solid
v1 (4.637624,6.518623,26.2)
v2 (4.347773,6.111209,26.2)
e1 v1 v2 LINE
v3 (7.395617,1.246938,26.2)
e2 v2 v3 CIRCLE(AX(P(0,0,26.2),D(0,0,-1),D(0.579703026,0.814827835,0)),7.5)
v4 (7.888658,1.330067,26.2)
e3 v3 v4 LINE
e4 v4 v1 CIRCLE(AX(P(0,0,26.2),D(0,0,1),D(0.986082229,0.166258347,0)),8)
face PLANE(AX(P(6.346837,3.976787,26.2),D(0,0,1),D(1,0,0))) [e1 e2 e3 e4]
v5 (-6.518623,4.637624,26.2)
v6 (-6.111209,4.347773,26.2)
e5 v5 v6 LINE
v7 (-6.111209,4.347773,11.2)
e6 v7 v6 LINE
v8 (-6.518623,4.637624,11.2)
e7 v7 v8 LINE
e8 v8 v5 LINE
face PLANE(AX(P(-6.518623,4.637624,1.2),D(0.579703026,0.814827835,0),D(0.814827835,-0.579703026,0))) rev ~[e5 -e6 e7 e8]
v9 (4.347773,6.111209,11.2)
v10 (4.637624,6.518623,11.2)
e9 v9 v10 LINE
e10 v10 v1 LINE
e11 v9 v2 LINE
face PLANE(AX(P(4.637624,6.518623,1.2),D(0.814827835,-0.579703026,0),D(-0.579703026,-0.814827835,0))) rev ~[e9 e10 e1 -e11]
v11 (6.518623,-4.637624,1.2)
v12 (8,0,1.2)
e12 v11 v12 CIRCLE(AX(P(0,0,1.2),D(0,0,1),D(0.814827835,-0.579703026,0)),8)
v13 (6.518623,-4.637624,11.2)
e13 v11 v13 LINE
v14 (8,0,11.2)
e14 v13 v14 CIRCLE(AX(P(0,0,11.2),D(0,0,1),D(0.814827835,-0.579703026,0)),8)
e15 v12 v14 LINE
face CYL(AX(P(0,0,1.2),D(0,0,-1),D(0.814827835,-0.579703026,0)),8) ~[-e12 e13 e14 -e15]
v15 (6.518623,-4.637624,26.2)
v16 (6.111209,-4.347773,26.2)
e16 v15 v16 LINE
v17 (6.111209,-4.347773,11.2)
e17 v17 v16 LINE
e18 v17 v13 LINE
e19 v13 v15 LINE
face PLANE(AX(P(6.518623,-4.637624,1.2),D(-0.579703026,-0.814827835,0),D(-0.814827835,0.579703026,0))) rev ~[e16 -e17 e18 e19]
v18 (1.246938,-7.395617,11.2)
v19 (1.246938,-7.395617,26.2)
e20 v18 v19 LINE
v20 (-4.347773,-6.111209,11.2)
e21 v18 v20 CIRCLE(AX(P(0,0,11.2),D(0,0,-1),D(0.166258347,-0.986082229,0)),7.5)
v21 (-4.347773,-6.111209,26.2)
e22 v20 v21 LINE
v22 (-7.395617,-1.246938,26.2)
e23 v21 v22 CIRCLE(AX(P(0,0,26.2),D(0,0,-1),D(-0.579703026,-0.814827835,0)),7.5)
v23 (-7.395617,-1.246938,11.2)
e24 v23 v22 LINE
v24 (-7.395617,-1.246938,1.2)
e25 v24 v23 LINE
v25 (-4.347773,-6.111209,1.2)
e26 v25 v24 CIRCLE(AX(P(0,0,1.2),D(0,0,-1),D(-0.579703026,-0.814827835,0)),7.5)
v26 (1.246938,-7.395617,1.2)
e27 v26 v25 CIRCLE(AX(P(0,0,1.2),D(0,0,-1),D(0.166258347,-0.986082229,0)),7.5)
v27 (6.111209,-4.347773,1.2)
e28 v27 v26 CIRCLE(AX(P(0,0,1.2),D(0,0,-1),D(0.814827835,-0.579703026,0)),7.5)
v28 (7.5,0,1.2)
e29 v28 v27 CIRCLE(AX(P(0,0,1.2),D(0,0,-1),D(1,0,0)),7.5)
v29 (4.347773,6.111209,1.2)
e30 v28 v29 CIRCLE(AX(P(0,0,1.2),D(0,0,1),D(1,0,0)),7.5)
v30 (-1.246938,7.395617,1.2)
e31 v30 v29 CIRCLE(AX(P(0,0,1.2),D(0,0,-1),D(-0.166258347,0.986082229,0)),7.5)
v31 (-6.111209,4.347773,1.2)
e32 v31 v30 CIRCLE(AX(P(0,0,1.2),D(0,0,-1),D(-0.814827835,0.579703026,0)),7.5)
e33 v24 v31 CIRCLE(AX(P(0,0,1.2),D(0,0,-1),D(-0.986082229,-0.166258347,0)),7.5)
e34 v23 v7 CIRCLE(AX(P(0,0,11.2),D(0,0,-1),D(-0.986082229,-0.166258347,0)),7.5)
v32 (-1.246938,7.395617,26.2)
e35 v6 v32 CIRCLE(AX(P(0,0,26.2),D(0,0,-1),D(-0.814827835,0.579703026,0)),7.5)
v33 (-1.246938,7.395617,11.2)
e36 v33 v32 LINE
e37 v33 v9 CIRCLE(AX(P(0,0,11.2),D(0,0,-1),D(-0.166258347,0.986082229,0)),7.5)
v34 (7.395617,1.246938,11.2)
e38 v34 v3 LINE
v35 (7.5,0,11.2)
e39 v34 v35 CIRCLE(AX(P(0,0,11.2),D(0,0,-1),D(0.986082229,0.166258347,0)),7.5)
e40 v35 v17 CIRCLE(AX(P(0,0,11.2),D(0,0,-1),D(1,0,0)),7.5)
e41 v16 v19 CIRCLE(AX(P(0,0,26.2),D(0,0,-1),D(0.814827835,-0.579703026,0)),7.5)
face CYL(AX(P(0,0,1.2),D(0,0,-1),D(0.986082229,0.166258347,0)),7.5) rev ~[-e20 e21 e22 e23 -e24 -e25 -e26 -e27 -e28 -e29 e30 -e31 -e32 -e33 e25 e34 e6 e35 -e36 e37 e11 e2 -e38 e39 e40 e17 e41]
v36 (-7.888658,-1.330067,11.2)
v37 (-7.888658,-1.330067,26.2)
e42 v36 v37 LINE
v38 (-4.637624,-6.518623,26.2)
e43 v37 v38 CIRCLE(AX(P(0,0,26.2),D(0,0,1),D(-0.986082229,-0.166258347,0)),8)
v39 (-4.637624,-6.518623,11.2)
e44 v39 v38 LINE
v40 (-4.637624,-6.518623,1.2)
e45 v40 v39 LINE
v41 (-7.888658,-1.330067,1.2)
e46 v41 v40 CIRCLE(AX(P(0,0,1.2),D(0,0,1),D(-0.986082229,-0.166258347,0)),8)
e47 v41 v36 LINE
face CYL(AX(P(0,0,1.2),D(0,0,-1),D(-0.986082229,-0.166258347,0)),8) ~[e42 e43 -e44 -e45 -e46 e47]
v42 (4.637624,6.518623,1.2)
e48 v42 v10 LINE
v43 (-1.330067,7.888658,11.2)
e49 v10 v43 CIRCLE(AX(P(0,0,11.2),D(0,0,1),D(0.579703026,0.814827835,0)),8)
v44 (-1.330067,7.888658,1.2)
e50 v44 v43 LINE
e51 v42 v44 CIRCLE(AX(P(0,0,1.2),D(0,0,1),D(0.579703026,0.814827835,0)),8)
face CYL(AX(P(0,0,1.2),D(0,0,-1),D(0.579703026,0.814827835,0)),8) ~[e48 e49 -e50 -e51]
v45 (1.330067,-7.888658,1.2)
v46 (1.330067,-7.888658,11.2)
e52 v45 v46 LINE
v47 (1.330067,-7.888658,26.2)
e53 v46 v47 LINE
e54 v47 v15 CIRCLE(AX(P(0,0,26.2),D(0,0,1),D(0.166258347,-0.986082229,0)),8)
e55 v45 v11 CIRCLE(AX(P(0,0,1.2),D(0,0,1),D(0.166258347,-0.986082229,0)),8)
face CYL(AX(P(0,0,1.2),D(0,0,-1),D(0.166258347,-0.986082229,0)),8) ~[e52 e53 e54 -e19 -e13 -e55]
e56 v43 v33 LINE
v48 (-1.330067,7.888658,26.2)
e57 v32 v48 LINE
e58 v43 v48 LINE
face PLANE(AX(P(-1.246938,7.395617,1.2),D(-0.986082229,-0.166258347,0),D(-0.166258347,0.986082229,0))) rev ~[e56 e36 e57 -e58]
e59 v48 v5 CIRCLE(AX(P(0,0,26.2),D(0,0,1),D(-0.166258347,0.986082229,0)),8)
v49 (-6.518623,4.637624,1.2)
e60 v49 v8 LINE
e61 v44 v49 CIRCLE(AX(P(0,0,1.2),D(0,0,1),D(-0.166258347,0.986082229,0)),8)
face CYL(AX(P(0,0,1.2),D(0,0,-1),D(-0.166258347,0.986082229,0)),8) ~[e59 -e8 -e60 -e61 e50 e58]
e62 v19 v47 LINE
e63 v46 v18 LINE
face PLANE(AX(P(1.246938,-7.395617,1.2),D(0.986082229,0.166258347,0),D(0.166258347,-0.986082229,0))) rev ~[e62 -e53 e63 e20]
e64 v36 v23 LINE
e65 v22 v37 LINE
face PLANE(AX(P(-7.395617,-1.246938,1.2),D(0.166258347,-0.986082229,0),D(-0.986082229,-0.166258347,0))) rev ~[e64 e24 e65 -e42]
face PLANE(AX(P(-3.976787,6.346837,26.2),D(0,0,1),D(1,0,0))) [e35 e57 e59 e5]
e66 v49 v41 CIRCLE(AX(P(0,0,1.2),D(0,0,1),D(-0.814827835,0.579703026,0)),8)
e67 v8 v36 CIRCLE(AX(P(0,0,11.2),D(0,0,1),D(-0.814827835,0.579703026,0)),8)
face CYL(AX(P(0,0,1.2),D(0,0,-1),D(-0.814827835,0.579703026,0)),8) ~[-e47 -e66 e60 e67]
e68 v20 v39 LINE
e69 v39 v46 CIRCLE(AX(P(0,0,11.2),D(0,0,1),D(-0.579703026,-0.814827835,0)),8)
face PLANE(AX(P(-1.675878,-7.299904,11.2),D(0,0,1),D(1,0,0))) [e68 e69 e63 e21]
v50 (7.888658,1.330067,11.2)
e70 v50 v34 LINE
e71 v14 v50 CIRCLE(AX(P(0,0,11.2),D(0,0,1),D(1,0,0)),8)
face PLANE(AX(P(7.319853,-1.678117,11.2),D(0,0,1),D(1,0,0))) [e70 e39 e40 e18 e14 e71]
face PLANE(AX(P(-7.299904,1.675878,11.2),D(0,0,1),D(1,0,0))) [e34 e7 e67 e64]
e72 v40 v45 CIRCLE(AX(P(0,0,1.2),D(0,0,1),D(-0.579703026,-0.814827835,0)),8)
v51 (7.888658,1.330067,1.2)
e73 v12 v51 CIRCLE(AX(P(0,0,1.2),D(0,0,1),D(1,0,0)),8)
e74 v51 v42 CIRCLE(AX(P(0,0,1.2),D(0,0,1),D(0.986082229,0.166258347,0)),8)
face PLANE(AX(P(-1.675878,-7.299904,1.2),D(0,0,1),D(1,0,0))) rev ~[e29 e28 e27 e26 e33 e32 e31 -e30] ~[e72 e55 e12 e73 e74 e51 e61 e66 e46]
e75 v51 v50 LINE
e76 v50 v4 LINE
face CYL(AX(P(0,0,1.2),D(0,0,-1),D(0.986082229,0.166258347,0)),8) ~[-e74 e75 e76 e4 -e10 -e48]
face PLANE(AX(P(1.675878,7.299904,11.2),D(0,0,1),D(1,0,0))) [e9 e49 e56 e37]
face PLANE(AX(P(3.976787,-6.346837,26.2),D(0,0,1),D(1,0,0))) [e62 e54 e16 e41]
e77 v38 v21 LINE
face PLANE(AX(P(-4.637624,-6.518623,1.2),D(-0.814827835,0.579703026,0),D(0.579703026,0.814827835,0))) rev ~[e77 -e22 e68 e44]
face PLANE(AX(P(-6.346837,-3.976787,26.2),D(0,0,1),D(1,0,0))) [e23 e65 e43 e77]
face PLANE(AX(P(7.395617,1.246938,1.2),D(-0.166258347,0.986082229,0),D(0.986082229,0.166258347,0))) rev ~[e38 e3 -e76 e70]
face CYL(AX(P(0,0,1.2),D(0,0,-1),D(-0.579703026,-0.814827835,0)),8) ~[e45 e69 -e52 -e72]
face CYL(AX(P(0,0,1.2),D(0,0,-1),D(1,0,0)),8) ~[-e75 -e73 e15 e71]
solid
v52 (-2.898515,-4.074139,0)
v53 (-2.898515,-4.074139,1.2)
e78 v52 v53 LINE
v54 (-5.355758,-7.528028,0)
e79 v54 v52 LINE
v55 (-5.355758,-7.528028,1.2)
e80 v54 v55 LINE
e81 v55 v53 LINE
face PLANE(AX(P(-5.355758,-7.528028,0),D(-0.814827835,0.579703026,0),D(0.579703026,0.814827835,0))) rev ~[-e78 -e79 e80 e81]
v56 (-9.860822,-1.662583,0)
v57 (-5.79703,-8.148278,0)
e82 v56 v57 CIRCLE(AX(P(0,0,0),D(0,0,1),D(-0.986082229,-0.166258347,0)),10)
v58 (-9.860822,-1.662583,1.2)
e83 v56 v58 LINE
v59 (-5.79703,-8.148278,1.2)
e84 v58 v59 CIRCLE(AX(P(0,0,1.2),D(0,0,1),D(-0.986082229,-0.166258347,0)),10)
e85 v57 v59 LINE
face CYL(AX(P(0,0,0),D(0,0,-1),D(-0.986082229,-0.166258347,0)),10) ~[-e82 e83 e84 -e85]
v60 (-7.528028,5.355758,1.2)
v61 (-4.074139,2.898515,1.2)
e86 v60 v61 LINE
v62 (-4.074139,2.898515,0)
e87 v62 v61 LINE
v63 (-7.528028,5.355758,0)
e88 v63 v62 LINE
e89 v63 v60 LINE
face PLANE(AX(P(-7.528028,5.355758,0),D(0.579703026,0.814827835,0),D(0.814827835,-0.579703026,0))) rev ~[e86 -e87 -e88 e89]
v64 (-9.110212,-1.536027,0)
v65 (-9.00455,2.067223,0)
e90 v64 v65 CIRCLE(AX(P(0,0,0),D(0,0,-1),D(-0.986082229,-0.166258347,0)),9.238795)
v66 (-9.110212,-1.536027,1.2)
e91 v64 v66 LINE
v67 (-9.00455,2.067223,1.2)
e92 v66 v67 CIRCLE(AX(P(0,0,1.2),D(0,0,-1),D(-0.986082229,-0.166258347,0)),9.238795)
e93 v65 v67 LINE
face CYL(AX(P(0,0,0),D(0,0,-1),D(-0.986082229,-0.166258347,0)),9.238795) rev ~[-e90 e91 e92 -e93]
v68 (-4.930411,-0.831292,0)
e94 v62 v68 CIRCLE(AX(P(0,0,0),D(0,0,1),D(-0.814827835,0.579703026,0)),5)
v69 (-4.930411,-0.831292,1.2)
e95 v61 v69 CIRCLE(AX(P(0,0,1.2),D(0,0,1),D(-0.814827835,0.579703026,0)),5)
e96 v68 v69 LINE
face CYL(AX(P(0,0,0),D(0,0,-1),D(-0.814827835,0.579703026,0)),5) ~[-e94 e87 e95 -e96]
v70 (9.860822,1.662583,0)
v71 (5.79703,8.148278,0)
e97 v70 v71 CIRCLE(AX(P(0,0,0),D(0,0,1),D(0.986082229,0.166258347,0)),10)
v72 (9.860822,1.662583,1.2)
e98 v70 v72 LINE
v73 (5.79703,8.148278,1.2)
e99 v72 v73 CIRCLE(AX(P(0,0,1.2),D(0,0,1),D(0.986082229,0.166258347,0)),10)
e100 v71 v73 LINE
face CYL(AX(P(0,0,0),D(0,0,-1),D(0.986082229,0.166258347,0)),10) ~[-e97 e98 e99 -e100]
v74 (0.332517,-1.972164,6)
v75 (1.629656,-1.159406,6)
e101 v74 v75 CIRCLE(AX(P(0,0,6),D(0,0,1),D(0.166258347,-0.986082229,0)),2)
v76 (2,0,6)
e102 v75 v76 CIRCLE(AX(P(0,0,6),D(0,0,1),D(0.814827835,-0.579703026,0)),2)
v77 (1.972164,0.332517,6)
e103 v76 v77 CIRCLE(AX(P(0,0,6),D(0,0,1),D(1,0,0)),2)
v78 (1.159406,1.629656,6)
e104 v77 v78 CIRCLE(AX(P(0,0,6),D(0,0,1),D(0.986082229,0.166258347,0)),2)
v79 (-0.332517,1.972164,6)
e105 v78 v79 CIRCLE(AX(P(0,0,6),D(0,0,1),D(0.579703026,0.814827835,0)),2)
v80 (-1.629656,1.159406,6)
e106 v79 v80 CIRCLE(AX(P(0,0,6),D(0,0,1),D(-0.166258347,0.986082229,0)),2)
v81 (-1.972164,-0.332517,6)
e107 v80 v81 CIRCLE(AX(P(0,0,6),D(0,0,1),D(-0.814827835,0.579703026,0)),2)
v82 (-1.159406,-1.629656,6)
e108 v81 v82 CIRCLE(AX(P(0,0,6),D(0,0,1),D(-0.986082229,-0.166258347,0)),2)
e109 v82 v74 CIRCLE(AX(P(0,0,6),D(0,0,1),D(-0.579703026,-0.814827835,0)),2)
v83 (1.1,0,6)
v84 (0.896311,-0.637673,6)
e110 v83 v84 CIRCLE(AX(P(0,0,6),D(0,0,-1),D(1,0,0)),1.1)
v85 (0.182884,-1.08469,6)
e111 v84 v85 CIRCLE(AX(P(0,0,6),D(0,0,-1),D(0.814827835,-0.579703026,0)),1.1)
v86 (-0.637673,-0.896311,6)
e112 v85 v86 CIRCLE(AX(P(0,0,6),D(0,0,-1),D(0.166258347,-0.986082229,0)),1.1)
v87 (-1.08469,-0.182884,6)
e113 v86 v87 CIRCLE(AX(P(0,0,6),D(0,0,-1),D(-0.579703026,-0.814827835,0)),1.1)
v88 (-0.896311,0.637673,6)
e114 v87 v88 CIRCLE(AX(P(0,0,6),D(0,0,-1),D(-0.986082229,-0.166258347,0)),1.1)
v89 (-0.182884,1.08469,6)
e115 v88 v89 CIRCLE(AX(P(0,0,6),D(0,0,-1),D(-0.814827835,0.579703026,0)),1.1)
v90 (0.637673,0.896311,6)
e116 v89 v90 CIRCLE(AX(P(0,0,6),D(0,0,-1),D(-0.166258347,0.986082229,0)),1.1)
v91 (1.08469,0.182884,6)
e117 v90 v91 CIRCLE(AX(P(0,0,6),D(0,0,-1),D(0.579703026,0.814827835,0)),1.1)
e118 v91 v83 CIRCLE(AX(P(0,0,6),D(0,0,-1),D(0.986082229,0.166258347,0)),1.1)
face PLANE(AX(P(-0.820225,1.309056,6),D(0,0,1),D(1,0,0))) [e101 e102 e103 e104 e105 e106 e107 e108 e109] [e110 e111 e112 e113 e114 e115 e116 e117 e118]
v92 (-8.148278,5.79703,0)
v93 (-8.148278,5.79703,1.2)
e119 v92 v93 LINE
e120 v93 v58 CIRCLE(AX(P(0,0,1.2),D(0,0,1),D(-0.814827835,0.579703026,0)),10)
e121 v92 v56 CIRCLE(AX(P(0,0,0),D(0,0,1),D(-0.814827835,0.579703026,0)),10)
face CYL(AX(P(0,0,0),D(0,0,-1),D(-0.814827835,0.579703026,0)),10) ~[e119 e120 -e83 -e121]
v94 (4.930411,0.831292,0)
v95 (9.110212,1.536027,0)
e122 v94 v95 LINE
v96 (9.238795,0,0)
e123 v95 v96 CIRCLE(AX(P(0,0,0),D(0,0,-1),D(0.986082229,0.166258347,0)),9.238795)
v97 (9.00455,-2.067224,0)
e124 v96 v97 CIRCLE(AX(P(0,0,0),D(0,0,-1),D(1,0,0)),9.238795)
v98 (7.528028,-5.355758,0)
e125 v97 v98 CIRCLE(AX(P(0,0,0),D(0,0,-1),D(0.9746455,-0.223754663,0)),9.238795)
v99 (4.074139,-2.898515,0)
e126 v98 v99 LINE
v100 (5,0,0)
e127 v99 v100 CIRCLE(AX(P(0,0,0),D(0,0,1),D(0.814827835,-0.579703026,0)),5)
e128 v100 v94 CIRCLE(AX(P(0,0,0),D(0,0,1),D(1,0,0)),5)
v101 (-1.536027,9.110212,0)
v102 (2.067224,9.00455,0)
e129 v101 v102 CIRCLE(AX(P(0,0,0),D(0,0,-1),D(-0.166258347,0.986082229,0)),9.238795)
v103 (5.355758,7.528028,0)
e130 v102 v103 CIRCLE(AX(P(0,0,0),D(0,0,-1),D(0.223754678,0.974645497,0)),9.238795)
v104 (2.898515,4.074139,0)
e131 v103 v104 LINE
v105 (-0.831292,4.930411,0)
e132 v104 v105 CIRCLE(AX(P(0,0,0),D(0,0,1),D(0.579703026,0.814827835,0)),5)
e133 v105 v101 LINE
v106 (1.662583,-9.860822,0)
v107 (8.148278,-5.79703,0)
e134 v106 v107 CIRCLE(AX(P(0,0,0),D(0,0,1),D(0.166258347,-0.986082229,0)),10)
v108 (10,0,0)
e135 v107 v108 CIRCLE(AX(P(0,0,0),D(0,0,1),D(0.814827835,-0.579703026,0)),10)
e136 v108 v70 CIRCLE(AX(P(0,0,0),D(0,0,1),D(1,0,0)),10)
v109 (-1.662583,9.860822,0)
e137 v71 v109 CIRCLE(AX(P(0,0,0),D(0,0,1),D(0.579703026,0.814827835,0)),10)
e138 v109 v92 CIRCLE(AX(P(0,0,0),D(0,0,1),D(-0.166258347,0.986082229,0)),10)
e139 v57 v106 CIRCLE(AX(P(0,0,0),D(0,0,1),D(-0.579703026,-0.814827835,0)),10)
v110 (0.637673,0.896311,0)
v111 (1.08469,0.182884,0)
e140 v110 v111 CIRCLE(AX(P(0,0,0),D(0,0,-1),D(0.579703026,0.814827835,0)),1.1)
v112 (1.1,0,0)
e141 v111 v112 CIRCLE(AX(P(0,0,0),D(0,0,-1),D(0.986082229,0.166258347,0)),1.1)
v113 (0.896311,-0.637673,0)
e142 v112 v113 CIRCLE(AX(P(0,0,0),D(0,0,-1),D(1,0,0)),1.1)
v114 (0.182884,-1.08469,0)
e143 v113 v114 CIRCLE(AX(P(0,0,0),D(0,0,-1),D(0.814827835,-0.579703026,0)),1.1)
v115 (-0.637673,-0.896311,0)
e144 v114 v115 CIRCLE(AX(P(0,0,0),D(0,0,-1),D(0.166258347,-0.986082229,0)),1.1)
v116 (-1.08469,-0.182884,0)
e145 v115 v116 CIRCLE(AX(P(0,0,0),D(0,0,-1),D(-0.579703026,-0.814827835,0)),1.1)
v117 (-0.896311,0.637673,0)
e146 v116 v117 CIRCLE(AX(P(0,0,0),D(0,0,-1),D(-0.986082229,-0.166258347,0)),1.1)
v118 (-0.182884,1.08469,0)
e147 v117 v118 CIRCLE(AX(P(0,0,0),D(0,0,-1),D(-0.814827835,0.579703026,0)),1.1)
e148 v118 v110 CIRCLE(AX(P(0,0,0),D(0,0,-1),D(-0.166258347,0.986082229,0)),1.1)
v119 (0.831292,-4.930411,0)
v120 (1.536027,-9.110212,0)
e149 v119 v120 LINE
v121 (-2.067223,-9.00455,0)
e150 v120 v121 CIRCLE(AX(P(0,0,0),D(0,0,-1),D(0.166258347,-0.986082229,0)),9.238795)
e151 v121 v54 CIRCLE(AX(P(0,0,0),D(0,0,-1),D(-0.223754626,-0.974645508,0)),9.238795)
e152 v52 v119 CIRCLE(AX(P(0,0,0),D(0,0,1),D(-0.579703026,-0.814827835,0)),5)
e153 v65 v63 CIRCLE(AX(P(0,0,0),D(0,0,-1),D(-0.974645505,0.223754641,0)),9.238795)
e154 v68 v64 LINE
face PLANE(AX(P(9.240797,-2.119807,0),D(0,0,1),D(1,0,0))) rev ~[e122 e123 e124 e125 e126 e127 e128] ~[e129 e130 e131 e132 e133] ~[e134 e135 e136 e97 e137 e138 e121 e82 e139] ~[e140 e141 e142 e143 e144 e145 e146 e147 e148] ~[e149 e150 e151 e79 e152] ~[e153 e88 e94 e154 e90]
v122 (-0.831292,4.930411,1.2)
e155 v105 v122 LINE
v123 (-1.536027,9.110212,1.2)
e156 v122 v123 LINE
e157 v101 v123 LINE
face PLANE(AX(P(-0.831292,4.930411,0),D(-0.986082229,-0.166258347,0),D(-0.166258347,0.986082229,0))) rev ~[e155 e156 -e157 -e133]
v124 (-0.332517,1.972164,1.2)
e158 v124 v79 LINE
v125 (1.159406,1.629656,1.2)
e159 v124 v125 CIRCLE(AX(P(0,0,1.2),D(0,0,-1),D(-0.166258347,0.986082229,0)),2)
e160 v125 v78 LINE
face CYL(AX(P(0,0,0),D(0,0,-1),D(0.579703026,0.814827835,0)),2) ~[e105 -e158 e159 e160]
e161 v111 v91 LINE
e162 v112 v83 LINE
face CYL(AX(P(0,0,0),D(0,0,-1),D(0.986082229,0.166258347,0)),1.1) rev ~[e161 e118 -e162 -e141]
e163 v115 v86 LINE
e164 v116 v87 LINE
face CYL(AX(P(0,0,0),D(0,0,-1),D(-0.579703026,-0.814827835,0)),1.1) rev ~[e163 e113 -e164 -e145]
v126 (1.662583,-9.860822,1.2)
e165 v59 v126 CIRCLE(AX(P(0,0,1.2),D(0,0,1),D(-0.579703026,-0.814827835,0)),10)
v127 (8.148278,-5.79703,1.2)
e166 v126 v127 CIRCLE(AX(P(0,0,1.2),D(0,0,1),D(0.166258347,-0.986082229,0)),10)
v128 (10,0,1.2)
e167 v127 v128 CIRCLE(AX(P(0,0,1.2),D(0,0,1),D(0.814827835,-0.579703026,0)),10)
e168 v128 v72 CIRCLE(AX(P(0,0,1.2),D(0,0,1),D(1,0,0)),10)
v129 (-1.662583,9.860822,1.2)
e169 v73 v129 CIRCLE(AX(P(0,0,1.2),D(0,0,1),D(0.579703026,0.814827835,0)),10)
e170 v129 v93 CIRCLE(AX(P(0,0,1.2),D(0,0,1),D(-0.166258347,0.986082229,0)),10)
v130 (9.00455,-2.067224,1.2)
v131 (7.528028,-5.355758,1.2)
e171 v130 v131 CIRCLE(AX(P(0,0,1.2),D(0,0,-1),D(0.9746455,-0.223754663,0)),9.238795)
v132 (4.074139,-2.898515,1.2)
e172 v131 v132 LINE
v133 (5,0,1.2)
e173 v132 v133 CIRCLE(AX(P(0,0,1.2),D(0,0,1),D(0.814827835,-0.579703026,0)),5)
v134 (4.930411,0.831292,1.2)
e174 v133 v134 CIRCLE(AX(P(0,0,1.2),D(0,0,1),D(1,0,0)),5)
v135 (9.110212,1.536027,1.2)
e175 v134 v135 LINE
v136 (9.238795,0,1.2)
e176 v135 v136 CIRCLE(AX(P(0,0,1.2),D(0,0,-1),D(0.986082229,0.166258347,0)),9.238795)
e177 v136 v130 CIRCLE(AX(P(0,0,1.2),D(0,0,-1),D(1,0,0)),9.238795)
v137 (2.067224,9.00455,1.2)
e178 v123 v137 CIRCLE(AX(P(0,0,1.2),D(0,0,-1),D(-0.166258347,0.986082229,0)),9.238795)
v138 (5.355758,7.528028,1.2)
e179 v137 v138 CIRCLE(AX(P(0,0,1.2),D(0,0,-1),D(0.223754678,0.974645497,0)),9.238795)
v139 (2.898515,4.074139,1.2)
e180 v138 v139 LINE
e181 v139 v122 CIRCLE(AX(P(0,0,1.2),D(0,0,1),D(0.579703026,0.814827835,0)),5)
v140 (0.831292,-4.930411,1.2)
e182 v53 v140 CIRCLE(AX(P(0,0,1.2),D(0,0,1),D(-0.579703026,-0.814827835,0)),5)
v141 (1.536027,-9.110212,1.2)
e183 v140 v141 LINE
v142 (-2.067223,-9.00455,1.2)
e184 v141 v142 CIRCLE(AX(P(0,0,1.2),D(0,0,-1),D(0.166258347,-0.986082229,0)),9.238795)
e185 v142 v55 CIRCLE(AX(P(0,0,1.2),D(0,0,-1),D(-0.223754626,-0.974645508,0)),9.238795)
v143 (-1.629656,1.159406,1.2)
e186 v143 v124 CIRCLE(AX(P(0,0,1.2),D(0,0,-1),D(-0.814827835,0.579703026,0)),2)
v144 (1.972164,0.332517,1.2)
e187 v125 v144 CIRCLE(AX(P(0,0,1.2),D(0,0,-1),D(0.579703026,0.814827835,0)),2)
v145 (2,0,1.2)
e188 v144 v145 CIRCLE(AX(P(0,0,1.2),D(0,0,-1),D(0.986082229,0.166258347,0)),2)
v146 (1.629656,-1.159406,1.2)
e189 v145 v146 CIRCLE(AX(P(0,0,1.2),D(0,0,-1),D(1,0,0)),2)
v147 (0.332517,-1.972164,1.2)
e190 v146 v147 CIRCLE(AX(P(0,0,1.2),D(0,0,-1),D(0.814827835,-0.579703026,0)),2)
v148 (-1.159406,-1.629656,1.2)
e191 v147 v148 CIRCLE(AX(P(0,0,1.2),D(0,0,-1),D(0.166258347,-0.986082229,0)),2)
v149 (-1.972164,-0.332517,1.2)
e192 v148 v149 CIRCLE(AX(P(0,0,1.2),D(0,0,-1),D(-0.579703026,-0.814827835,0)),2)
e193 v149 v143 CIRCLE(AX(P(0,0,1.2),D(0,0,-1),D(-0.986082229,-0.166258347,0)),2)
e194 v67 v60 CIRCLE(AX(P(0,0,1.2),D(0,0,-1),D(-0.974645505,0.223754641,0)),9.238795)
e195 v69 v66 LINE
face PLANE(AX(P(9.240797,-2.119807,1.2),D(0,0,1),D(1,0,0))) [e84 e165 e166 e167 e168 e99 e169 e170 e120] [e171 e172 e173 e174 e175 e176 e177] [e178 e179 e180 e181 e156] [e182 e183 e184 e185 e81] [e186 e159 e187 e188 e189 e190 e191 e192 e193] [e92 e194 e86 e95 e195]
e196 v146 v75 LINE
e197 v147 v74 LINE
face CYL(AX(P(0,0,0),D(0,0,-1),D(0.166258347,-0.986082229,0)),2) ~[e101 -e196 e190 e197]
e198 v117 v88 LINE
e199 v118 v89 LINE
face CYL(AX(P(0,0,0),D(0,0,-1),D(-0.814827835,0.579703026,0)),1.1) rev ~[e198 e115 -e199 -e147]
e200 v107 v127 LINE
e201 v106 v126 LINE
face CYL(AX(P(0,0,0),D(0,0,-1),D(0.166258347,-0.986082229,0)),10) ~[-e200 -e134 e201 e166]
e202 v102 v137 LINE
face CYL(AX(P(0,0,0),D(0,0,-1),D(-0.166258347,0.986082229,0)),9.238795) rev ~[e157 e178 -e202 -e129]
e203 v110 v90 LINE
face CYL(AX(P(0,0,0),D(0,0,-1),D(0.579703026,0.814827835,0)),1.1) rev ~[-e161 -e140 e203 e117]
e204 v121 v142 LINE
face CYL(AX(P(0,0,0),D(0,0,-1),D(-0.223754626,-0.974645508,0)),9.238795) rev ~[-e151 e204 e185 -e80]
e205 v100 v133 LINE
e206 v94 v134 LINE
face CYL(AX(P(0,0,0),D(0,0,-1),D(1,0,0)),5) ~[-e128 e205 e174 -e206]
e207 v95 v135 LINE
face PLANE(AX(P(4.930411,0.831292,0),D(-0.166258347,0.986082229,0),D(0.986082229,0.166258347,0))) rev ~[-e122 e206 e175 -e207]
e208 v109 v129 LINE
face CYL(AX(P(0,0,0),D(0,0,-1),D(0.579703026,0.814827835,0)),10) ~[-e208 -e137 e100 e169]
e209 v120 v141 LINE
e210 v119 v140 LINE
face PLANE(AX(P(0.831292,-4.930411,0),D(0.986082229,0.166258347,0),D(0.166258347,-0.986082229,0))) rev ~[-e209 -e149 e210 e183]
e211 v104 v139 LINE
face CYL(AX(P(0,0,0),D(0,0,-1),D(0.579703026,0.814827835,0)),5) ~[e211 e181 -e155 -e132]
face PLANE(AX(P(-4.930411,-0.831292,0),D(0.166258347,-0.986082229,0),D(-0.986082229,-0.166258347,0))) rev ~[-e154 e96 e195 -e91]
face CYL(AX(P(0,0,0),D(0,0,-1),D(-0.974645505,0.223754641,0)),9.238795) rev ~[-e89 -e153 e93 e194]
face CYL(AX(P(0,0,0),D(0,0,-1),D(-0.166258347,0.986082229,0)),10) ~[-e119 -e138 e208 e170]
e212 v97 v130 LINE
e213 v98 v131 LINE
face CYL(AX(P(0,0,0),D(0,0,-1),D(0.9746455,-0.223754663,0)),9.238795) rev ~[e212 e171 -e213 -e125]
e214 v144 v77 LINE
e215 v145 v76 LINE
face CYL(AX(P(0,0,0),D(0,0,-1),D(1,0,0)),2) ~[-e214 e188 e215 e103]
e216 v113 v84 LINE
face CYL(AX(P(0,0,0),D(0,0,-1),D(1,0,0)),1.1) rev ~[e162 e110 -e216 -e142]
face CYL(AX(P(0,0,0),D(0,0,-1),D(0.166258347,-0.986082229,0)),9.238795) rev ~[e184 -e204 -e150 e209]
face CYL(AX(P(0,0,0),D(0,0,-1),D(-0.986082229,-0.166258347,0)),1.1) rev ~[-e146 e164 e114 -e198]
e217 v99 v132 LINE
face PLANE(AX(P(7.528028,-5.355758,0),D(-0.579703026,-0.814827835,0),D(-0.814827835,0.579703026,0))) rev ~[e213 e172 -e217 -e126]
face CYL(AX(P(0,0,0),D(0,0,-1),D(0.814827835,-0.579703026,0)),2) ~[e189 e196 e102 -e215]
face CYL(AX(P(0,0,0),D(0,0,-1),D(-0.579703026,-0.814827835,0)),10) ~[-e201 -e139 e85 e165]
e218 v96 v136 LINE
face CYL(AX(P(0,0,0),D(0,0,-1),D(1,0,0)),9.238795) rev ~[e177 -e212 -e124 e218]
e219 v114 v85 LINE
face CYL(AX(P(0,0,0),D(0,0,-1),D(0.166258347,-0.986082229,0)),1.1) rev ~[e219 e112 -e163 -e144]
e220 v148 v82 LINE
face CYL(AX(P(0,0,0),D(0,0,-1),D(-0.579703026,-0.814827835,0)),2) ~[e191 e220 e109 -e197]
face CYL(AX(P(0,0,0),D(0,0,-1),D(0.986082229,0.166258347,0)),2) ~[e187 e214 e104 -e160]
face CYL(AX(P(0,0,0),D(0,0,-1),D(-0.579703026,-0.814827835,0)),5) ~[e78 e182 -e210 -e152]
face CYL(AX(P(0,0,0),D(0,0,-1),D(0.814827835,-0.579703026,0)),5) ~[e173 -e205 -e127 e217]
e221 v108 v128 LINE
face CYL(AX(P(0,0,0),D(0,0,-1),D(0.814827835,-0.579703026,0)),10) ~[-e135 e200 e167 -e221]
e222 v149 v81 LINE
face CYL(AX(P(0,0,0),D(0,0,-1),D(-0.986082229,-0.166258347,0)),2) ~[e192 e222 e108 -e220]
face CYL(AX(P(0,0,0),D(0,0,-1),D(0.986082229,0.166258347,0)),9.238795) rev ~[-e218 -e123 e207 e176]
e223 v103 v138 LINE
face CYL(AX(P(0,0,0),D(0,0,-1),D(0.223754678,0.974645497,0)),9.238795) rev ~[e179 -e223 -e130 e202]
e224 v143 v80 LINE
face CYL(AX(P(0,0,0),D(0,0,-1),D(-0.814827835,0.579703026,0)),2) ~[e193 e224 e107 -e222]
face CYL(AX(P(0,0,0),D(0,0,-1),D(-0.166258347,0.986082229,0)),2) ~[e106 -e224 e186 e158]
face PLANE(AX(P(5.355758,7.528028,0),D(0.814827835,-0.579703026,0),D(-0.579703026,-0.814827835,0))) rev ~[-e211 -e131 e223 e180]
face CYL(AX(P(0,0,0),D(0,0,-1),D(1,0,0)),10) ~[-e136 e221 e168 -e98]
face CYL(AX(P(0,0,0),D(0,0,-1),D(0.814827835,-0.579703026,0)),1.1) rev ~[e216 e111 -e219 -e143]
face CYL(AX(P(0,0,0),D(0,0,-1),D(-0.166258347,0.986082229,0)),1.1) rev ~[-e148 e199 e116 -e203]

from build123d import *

# Parameters (mm, degrees)
F1_DEPTH = 1.2
F2_DEPTH = 6
F4_DEPTH = 25
F5_DEPTH = 10


with BuildPart() as f1:
    # F0 (on Top) → F1 (new body)
    with BuildSketch(Plane.XY):
        with BuildLine():
            ThreePointArc((8.1482783535, -5.7970302633), (9.5258276159, -3.0427961207), (10, 0))
            ThreePointArc((10, 0), (9.965144828, 0.8341993506), (9.8608222887, 1.6625834689))
            Line((9.8608222887, 1.6625834689), (9.0045502887, -2.0672235383))
            Line((9.0045502887, -2.0672235383), (8.1482783535, -5.7970302633))
        make_face()
        with BuildLine():
            Line((7.8289263433, 4.9054308037), (9.8608222887, 1.6625834689))
            ThreePointArc((9.8608222887, 1.6625834689), (8.4739687378, 5.3096001573), (5.7970302633, 8.1482783535))
            Line((5.7970302633, 8.1482783535), (7.8289263433, 4.9054308037))
        make_face()
        with BuildLine():
            Line((9.1102118863, 1.536026838), (9.8608222887, 1.6625834689))
            Line((9.8608222887, 1.6625834689), (7.8289263433, 4.9054308037))
            ThreePointArc((7.8289263433, 4.9054308037), (8.6354977715, 3.2838266242), (9.1102118863, 1.536026838))
        make_face()
        with BuildLine():
            Line((9.0045502887, -2.0672235383), (9.8608222887, 1.6625834689))
            Line((9.8608222887, 1.6625834689), (9.1102118863, 1.536026838))
            ThreePointArc((9.1102118863, 1.536026838), (9.2065933451, 0.7706997061), (9.2387953251, 0))
            ThreePointArc((9.2387953251, 0), (9.1800472812, -1.040226405), (9.0045502887, -2.0672235383))
        make_face()
        with BuildLine():
            Line((7.528027596, -5.3557576096), (8.1482783535, -5.7970302633))
            Line((8.1482783535, -5.7970302633), (9.0045502887, -2.0672235383))
            ThreePointArc((9.0045502887, -2.0672235383), (8.4282351037, -3.7842029671), (7.528027596, -5.3557576096))
        make_face()
        with BuildLine():
            ThreePointArc((1.6625834689, -9.8608222887), (5.3096001573, -8.4739687378), (8.1482783535, -5.7970302633))
            Line((8.1482783535, -5.7970302633), (4.9054307168, -7.8289263978))
            Line((4.9054307168, -7.8289263978), (1.6625834689, -9.8608222887))
        make_face()
        with BuildLine():
            Line((4.9054307168, -7.8289263978), (8.1482783535, -5.7970302633))
            Line((8.1482783535, -5.7970302633), (7.528027596, -5.3557576096))
            ThreePointArc((7.528027596, -5.3557576096), (6.3385220965, -6.7214936355), (4.9054307168, -7.8289263978))
        make_face()
        with BuildLine():
            Line((2.0672236693, 9.0045502586), (5.7970302633, 8.1482783535))
            ThreePointArc((5.7970302633, 8.1482783535), (2.2375464814, 9.7464550347), (-1.6625834689, 9.8608222887))
            Line((-1.6625834689, 9.8608222887), (2.0672236693, 9.0045502586))
        make_face()
        with BuildLine():
            Line((5.3557576096, 7.528027596), (5.7970302633, 8.1482783535))
            Line((5.7970302633, 8.1482783535), (2.0672236693, 9.0045502586))
            ThreePointArc((2.0672236693, 9.0045502586), (3.7842030284, 8.4282350762), (5.3557576096, 7.528027596))
        make_face()
        with BuildLine():
            Line((7.8289263433, 4.9054308037), (5.7970302633, 8.1482783535))
            Line((5.7970302633, 8.1482783535), (5.3557576096, 7.528027596))
            ThreePointArc((5.3557576096, 7.528027596), (6.7214936003, 6.3385221338), (7.8289263433, 4.9054308037))
        make_face()
        with BuildLine():
            Line((1.536026838, -9.1102118863), (1.6625834689, -9.8608222887))
            Line((1.6625834689, -9.8608222887), (4.9054307168, -7.8289263978))
            ThreePointArc((4.9054307168, -7.8289263978), (3.2838265763, -8.6354977897), (1.536026838, -9.1102118863))
        make_face()
        with BuildLine():
            ThreePointArc((-5.7970302633, -8.1482783535), (-2.2375464814, -9.7464550347), (1.6625834689, -9.8608222887))
            Line((1.6625834689, -9.8608222887), (-2.0672231954, -9.0045503674))
            Line((-2.0672231954, -9.0045503674), (-5.7970302633, -8.1482783535))
        make_face()
        with BuildLine():
            Line((-2.0672231954, -9.0045503674), (1.6625834689, -9.8608222887))
            Line((1.6625834689, -9.8608222887), (1.536026838, -9.1102118863))
            ThreePointArc((1.536026838, -9.1102118863), (-0.2708015541, -9.2348256929), (-2.0672231954, -9.0045503674))
        make_face()
        with BuildLine():
            Line((-4.9054310148, 7.828926211), (-1.6625834689, 9.8608222887))
            ThreePointArc((-1.6625834689, 9.8608222887), (-5.3096001573, 8.4739687378), (-8.1482783535, 5.7970302633))
            Line((-8.1482783535, 5.7970302633), (-4.9054310148, 7.828926211))
        make_face()
        with BuildLine():
            Line((-1.536026838, 9.1102118863), (-1.6625834689, 9.8608222887))
            Line((-1.6625834689, 9.8608222887), (-4.9054310148, 7.828926211))
            ThreePointArc((-4.9054310148, 7.828926211), (-3.2838267407, 8.6354977272), (-1.536026838, 9.1102118863))
        make_face()
        with BuildLine():
            Line((2.0672236693, 9.0045502586), (-1.6625834689, 9.8608222887))
            Line((-1.6625834689, 9.8608222887), (-1.536026838, 9.1102118863))
            ThreePointArc((-1.536026838, 9.1102118863), (0.2708017971, 9.2348256857), (2.0672236693, 9.0045502586))
        make_face()
        with BuildLine():
            Line((-5.3557576096, -7.528027596), (-5.7970302633, -8.1482783535))
            Line((-5.7970302633, -8.1482783535), (-2.0672231954, -9.0045503674))
            ThreePointArc((-2.0672231954, -9.0045503674), (-3.7842028066, -8.4282351757), (-5.3557576096, -7.528027596))
        make_face()
        with BuildLine():
            ThreePointArc((-9.8608222887, -1.6625834689), (-8.4739687378, -5.3096001573), (-5.7970302633, -8.1482783535))
            Line((-5.7970302633, -8.1482783535), (-7.8289263978, -4.9054307168))
            Line((-7.8289263978, -4.9054307168), (-9.8608222887, -1.6625834689))
        make_face()
        with BuildLine():
            Line((-7.8289263978, -4.9054307168), (-5.7970302633, -8.1482783535))
            Line((-5.7970302633, -8.1482783535), (-5.3557576096, -7.528027596))
            ThreePointArc((-5.3557576096, -7.528027596), (-6.7214936355, -6.3385220965), (-7.8289263978, -4.9054307168))
        make_face()
        with BuildLine():
            Line((-9.004550337, 2.0672233281), (-8.1482783535, 5.7970302633))
            ThreePointArc((-8.1482783535, 5.7970302633), (-9.7464550347, 2.2375464814), (-9.8608222887, -1.6625834689))
            Line((-9.8608222887, -1.6625834689), (-9.004550337, 2.0672233281))
        make_face()
        with BuildLine():
            Line((-7.528027596, 5.3557576096), (-8.1482783535, 5.7970302633))
            Line((-8.1482783535, 5.7970302633), (-9.004550337, 2.0672233281))
            ThreePointArc((-9.004550337, 2.0672233281), (-8.4282351479, 3.7842028687), (-7.528027596, 5.3557576096))
        make_face()
        with BuildLine():
            Line((-4.9054310148, 7.828926211), (-8.1482783535, 5.7970302633))
            Line((-8.1482783535, 5.7970302633), (-7.528027596, 5.3557576096))
            ThreePointArc((-7.528027596, 5.3557576096), (-6.3385222244, 6.7214935148), (-4.9054310148, 7.828926211))
        make_face()
        with BuildLine():
            Line((-9.1102118863, -1.536026838), (-9.8608222887, -1.6625834689))
            Line((-9.8608222887, -1.6625834689), (-7.8289263978, -4.9054307168))
            ThreePointArc((-7.8289263978, -4.9054307168), (-8.6354977897, -3.2838265763), (-9.1102118863, -1.536026838))
        make_face()
        with BuildLine():
            Line((-9.004550337, 2.0672233281), (-9.8608222887, -1.6625834689))
            Line((-9.8608222887, -1.6625834689), (-9.1102118863, -1.536026838))
            ThreePointArc((-9.1102118863, -1.536026838), (-9.2348256909, 0.2708016221), (-9.004550337, 2.0672233281))
        make_face()
        with BuildLine():
            ThreePointArc((-4.9304111443, -0.8312917344), (-4.2369843689, -2.6548000787), (-2.8985151316, -4.0741391768))
            Line((-2.8985151316, -4.0741391768), (-1.1594060527, -1.6296556707))
            ThreePointArc((-1.1594060527, -1.6296556707), (-1.6947937476, -1.0619200315), (-1.9721644577, -0.3325166938))
            Line((-1.9721644577, -0.3325166938), (-4.9304111443, -0.8312917344))
        make_face()
        with BuildLine():
            Line((-1.6296556707, 1.1594060527), (-4.0741391768, 2.8985151316))
            ThreePointArc((-4.0741391768, 2.8985151316), (-4.8732275174, 1.1187732407), (-4.9304111443, -0.8312917344))
            Line((-4.9304111443, -0.8312917344), (-1.9721644577, -0.3325166938))
            ThreePointArc((-1.9721644577, -0.3325166938), (-1.9492910069, 0.4475092963), (-1.6296556707, 1.1594060527))
        make_face()
        with BuildLine():
            Line((-0.3325166938, 1.9721644577), (-0.8312917344, 4.9304111443))
            ThreePointArc((-0.8312917344, 4.9304111443), (-2.6548000787, 4.2369843689), (-4.0741391768, 2.8985151316))
            Line((-4.0741391768, 2.8985151316), (-1.6296556707, 1.1594060527))
            ThreePointArc((-1.6296556707, 1.1594060527), (-1.0619200315, 1.6947937476), (-0.3325166938, 1.9721644577))
        make_face()
        with BuildLine():
            Line((1.1594060527, 1.6296556707), (2.8985151316, 4.0741391768))
            ThreePointArc((2.8985151316, 4.0741391768), (1.1187732407, 4.8732275174), (-0.8312917344, 4.9304111443))
            Line((-0.8312917344, 4.9304111443), (-0.3325166938, 1.9721644577))
            ThreePointArc((-0.3325166938, 1.9721644577), (0.4475092963, 1.9492910069), (1.1594060527, 1.6296556707))
        make_face()
        with BuildLine():
            Line((1.9721644577, 0.3325166938), (4.9304111443, 0.8312917344))
            ThreePointArc((4.9304111443, 0.8312917344), (4.2369843689, 2.6548000787), (2.8985151316, 4.0741391768))
            Line((2.8985151316, 4.0741391768), (1.1594060527, 1.6296556707))
            ThreePointArc((1.1594060527, 1.6296556707), (1.6947937476, 1.0619200315), (1.9721644577, 0.3325166938))
        make_face()
        with BuildLine():
            ThreePointArc((5, 0), (4.982572414, 0.4170996753), (4.9304111443, 0.8312917344))
            Line((4.9304111443, 0.8312917344), (1.9721644577, 0.3325166938))
            ThreePointArc((1.9721644577, 0.3325166938), (1.9930289656, 0.1668398701), (2, 0))
            ThreePointArc((2, 0), (1.9051655232, -0.6085592241), (1.6296556707, -1.1594060527))
            Line((1.6296556707, -1.1594060527), (4.0741391768, -2.8985151316))
            ThreePointArc((4.0741391768, -2.8985151316), (4.7629138079, -1.5213980604), (5, 0))
        make_face()
        with BuildLine():
            ThreePointArc((0.8312917344, -4.9304111443), (2.6548000787, -4.2369843689), (4.0741391768, -2.8985151316))
            Line((4.0741391768, -2.8985151316), (1.6296556707, -1.1594060527))
            ThreePointArc((1.6296556707, -1.1594060527), (1.0619200315, -1.6947937476), (0.3325166938, -1.9721644577))
            Line((0.3325166938, -1.9721644577), (0.8312917344, -4.9304111443))
        make_face()
        with BuildLine():
            ThreePointArc((-2.8985151316, -4.0741391768), (-1.1187732407, -4.8732275174), (0.8312917344, -4.9304111443))
            Line((0.8312917344, -4.9304111443), (0.3325166938, -1.9721644577))
            ThreePointArc((0.3325166938, -1.9721644577), (-0.4475092963, -1.9492910069), (-1.1594060527, -1.6296556707))
            Line((-1.1594060527, -1.6296556707), (-2.8985151316, -4.0741391768))
        make_face()
        with BuildLine():
            ThreePointArc((1.536026838, -9.1102118863), (3.2838265763, -8.6354977897), (4.9054307168, -7.8289263978))
            ThreePointArc((4.9054307168, -7.8289263978), (6.3385220965, -6.7214936355), (7.528027596, -5.3557576096))
            Line((7.528027596, -5.3557576096), (4.0741391768, -2.8985151316))
            ThreePointArc((4.0741391768, -2.8985151316), (2.6548000787, -4.2369843689), (0.8312917344, -4.9304111443))
            Line((0.8312917344, -4.9304111443), (1.536026838, -9.1102118863))
        make_face()
        with BuildLine():
            ThreePointArc((9.1102118863, 1.536026838), (8.6354977715, 3.2838266242), (7.8289263433, 4.9054308037))
            ThreePointArc((7.8289263433, 4.9054308037), (6.7214936003, 6.3385221338), (5.3557576096, 7.528027596))
            Line((5.3557576096, 7.528027596), (2.8985151316, 4.0741391768))
            ThreePointArc((2.8985151316, 4.0741391768), (4.2369843689, 2.6548000787), (4.9304111443, 0.8312917344))
            Line((4.9304111443, 0.8312917344), (9.1102118863, 1.536026838))
        make_face()
        with BuildLine():
            ThreePointArc((-1.536026838, 9.1102118863), (-3.2838267407, 8.6354977272), (-4.9054310148, 7.828926211))
            ThreePointArc((-4.9054310148, 7.828926211), (-6.3385222244, 6.7214935148), (-7.528027596, 5.3557576096))
            Line((-7.528027596, 5.3557576096), (-4.0741391768, 2.8985151316))
            ThreePointArc((-4.0741391768, 2.8985151316), (-2.6548000787, 4.2369843689), (-0.8312917344, 4.9304111443))
            Line((-0.8312917344, 4.9304111443), (-1.536026838, 9.1102118863))
        make_face()
        with BuildLine():
            ThreePointArc((-9.1102118863, -1.536026838), (-8.6354977897, -3.2838265763), (-7.8289263978, -4.9054307168))
            ThreePointArc((-7.8289263978, -4.9054307168), (-6.7214936355, -6.3385220965), (-5.3557576096, -7.528027596))
            Line((-5.3557576096, -7.528027596), (-2.8985151316, -4.0741391768))
            ThreePointArc((-2.8985151316, -4.0741391768), (-4.2369843689, -2.6548000787), (-4.9304111443, -0.8312917344))
            Line((-4.9304111443, -0.8312917344), (-9.1102118863, -1.536026838))
        make_face()
    extrude(amount=F1_DEPTH)

    # F0 (on Top) → F2 (join)
    with BuildSketch(Plane.XY):
        with BuildLine():
            Line((-0.1828841816, 1.0846904518), (-0.3325166938, 1.9721644577))
            ThreePointArc((-0.3325166938, 1.9721644577), (-1.0619200315, 1.6947937476), (-1.6296556707, 1.1594060527))
            Line((-1.6296556707, 1.1594060527), (-0.8963106189, 0.637673329))
            ThreePointArc((-0.8963106189, 0.637673329), (-0.5840560173, 0.9321365612), (-0.1828841816, 1.0846904518))
        make_face()
        with BuildLine():
            Line((-0.8963106189, 0.637673329), (-1.6296556707, 1.1594060527))
            ThreePointArc((-1.6296556707, 1.1594060527), (-1.9492910069, 0.4475092963), (-1.9721644577, -0.3325166938))
            Line((-1.9721644577, -0.3325166938), (-1.0846904518, -0.1828841816))
            ThreePointArc((-1.0846904518, -0.1828841816), (-1.0721100538, 0.246130113), (-0.8963106189, 0.637673329))
        make_face()
        with BuildLine():
            ThreePointArc((-1.9721644577, -0.3325166938), (-1.6947937476, -1.0619200315), (-1.1594060527, -1.6296556707))
            Line((-1.1594060527, -1.6296556707), (-0.637673329, -0.8963106189))
            ThreePointArc((-0.637673329, -0.8963106189), (-0.9321365612, -0.5840560173), (-1.0846904518, -0.1828841816))
            Line((-1.0846904518, -0.1828841816), (-1.9721644577, -0.3325166938))
        make_face()
        with BuildLine():
            ThreePointArc((-1.1594060527, -1.6296556707), (-0.4475092963, -1.9492910069), (0.3325166938, -1.9721644577))
            Line((0.3325166938, -1.9721644577), (0.1828841816, -1.0846904518))
            ThreePointArc((0.1828841816, -1.0846904518), (-0.246130113, -1.0721100538), (-0.637673329, -0.8963106189))
            Line((-0.637673329, -0.8963106189), (-1.1594060527, -1.6296556707))
        make_face()
        with BuildLine():
            ThreePointArc((0.3325166938, -1.9721644577), (1.0619200315, -1.6947937476), (1.6296556707, -1.1594060527))
            Line((1.6296556707, -1.1594060527), (0.8963106189, -0.637673329))
            ThreePointArc((0.8963106189, -0.637673329), (0.5840560173, -0.9321365612), (0.1828841816, -1.0846904518))
            Line((0.1828841816, -1.0846904518), (0.3325166938, -1.9721644577))
        make_face()
        with BuildLine():
            ThreePointArc((2, 0), (1.9930289656, 0.1668398701), (1.9721644577, 0.3325166938))
            Line((1.9721644577, 0.3325166938), (1.0846904518, 0.1828841816))
            ThreePointArc((1.0846904518, 0.1828841816), (1.0961659311, 0.0917619286), (1.1, 0))
            ThreePointArc((1.1, 0), (1.0478410377, -0.3347075733), (0.8963106189, -0.637673329))
            Line((0.8963106189, -0.637673329), (1.6296556707, -1.1594060527))
            ThreePointArc((1.6296556707, -1.1594060527), (1.9051655232, -0.6085592241), (2, 0))
        make_face()
        with BuildLine():
            Line((1.0846904518, 0.1828841816), (1.9721644577, 0.3325166938))
            ThreePointArc((1.9721644577, 0.3325166938), (1.6947937476, 1.0619200315), (1.1594060527, 1.6296556707))
            Line((1.1594060527, 1.6296556707), (0.637673329, 0.8963106189))
            ThreePointArc((0.637673329, 0.8963106189), (0.9321365612, 0.5840560173), (1.0846904518, 0.1828841816))
        make_face()
        with BuildLine():
            Line((0.637673329, 0.8963106189), (1.1594060527, 1.6296556707))
            ThreePointArc((1.1594060527, 1.6296556707), (0.4475092963, 1.9492910069), (-0.3325166938, 1.9721644577))
            Line((-0.3325166938, 1.9721644577), (-0.1828841816, 1.0846904518))
            ThreePointArc((-0.1828841816, 1.0846904518), (0.246130113, 1.0721100538), (0.637673329, 0.8963106189))
        make_face()
    extrude(amount=F2_DEPTH)


with BuildPart() as f4:
    # F3 (on face) → F4 (new body)
    with BuildSketch(Plane.XY.offset(1.2)):
        with BuildLine():
            Line((6.5186226828, -4.6376242106), (6.1112087651, -4.3477726975))
            ThreePointArc((6.1112087651, -4.3477726975), (3.982200118, -6.3554765533), (1.2469376016, -7.3956167165))
            Line((1.2469376016, -7.3956167165), (1.3300667751, -7.888657831))
            ThreePointArc((1.3300667751, -7.888657831), (4.2476801259, -6.7791749902), (6.5186226828, -4.6376242106))
        make_face()
    extrude(amount=F4_DEPTH)



with BuildPart() as f4b:
    # F3 (on face) → F4, piece 2 (new body)
    with BuildSketch(Plane.XY.offset(1.2)):
        with BuildLine():
            ThreePointArc((-6.1112087651, 4.3477726975), (-3.982200118, 6.3554765533), (-1.2469376016, 7.3956167165))
            Line((-1.2469376016, 7.3956167165), (-1.3300667751, 7.888657831))
            ThreePointArc((-1.3300667751, 7.888657831), (-4.2476801259, 6.7791749902), (-6.5186226828, 4.6376242106))
            Line((-6.5186226828, 4.6376242106), (-6.1112087651, 4.3477726975))
        make_face()
    extrude(amount=F4_DEPTH)


with BuildPart() as f4c:
    # F3 (on face) → F4, piece 3 (new body)
    with BuildSketch(Plane.XY.offset(1.2)):
        with BuildLine():
            ThreePointArc((4.3477726975, 6.1112087651), (6.3554765533, 3.982200118), (7.3956167165, 1.2469376016))
            Line((7.3956167165, 1.2469376016), (7.888657831, 1.3300667751))
            ThreePointArc((7.888657831, 1.3300667751), (6.7791749902, 4.2476801259), (4.6376242106, 6.5186226828))
            Line((4.6376242106, 6.5186226828), (4.3477726975, 6.1112087651))
        make_face()
    extrude(amount=F4_DEPTH)


with BuildPart() as f4d:
    # F3 (on face) → F4, piece 4 (new body)
    with BuildSketch(Plane.XY.offset(1.2)):
        with BuildLine():
            Line((-4.6376242106, -6.5186226828), (-4.3477726975, -6.1112087651))
            ThreePointArc((-4.3477726975, -6.1112087651), (-6.3554765533, -3.982200118), (-7.3956167165, -1.2469376016))
            Line((-7.3956167165, -1.2469376016), (-7.888657831, -1.3300667751))
            ThreePointArc((-7.888657831, -1.3300667751), (-6.7791749902, -4.2476801259), (-4.6376242106, -6.5186226828))
        make_face()
    extrude(amount=F4_DEPTH)


with BuildPart() as f4_1:
    add(f4.part)

    add(f4b.part)  # F5 merges F4b

    add(f4c.part)  # F5 merges F4c

    add(f4d.part)  # F5 merges F4d
    # F3 (on face) → F5 (join)
    with BuildSketch(Plane.XY.offset(1.2)):
        with BuildLine():
            Line((1.3300667751, -7.888657831), (1.2469376016, -7.3956167165))
            ThreePointArc((1.2469376016, -7.3956167165), (-1.6781598611, -7.309841276), (-4.3477726975, -6.1112087651))
            Line((-4.3477726975, -6.1112087651), (-4.6376242106, -6.5186226828))
            ThreePointArc((-4.6376242106, -6.5186226828), (-1.7900371851, -7.7971640278), (1.3300667751, -7.888657831))
        make_face()
        with BuildLine():
            ThreePointArc((7.3956167165, 1.2469376016), (7.473858621, 0.625649513), (7.5, 0))
            ThreePointArc((7.5, 0), (7.1443707119, -2.2820970906), (6.1112087651, -4.3477726975))
            Line((6.1112087651, -4.3477726975), (6.5186226828, -4.6376242106))
            ThreePointArc((6.5186226828, -4.6376242106), (7.6206620927, -2.4342368966), (8, 0))
            ThreePointArc((8, 0), (7.9721158624, 0.6673594805), (7.888657831, 1.3300667751))
            Line((7.888657831, 1.3300667751), (7.3956167165, 1.2469376016))
        make_face()
        with BuildLine():
            ThreePointArc((-1.2469376016, 7.3956167165), (1.6781598611, 7.309841276), (4.3477726975, 6.1112087651))
            Line((4.3477726975, 6.1112087651), (4.6376242106, 6.5186226828))
            ThreePointArc((4.6376242106, 6.5186226828), (1.7900371851, 7.7971640278), (-1.3300667751, 7.888657831))
            Line((-1.3300667751, 7.888657831), (-1.2469376016, 7.3956167165))
        make_face()
        with BuildLine():
            ThreePointArc((-7.3956167165, -1.2469376016), (-7.309841276, 1.6781598611), (-6.1112087651, 4.3477726975))
            Line((-6.1112087651, 4.3477726975), (-6.5186226828, 4.6376242106))
            ThreePointArc((-6.5186226828, 4.6376242106), (-7.7971640278, 1.7900371851), (-7.888657831, -1.3300667751))
            Line((-7.888657831, -1.3300667751), (-7.3956167165, -1.2469376016))
        make_face()
    extrude(amount=F5_DEPTH)


solid = Compound([f1.part, f4_1.part])
